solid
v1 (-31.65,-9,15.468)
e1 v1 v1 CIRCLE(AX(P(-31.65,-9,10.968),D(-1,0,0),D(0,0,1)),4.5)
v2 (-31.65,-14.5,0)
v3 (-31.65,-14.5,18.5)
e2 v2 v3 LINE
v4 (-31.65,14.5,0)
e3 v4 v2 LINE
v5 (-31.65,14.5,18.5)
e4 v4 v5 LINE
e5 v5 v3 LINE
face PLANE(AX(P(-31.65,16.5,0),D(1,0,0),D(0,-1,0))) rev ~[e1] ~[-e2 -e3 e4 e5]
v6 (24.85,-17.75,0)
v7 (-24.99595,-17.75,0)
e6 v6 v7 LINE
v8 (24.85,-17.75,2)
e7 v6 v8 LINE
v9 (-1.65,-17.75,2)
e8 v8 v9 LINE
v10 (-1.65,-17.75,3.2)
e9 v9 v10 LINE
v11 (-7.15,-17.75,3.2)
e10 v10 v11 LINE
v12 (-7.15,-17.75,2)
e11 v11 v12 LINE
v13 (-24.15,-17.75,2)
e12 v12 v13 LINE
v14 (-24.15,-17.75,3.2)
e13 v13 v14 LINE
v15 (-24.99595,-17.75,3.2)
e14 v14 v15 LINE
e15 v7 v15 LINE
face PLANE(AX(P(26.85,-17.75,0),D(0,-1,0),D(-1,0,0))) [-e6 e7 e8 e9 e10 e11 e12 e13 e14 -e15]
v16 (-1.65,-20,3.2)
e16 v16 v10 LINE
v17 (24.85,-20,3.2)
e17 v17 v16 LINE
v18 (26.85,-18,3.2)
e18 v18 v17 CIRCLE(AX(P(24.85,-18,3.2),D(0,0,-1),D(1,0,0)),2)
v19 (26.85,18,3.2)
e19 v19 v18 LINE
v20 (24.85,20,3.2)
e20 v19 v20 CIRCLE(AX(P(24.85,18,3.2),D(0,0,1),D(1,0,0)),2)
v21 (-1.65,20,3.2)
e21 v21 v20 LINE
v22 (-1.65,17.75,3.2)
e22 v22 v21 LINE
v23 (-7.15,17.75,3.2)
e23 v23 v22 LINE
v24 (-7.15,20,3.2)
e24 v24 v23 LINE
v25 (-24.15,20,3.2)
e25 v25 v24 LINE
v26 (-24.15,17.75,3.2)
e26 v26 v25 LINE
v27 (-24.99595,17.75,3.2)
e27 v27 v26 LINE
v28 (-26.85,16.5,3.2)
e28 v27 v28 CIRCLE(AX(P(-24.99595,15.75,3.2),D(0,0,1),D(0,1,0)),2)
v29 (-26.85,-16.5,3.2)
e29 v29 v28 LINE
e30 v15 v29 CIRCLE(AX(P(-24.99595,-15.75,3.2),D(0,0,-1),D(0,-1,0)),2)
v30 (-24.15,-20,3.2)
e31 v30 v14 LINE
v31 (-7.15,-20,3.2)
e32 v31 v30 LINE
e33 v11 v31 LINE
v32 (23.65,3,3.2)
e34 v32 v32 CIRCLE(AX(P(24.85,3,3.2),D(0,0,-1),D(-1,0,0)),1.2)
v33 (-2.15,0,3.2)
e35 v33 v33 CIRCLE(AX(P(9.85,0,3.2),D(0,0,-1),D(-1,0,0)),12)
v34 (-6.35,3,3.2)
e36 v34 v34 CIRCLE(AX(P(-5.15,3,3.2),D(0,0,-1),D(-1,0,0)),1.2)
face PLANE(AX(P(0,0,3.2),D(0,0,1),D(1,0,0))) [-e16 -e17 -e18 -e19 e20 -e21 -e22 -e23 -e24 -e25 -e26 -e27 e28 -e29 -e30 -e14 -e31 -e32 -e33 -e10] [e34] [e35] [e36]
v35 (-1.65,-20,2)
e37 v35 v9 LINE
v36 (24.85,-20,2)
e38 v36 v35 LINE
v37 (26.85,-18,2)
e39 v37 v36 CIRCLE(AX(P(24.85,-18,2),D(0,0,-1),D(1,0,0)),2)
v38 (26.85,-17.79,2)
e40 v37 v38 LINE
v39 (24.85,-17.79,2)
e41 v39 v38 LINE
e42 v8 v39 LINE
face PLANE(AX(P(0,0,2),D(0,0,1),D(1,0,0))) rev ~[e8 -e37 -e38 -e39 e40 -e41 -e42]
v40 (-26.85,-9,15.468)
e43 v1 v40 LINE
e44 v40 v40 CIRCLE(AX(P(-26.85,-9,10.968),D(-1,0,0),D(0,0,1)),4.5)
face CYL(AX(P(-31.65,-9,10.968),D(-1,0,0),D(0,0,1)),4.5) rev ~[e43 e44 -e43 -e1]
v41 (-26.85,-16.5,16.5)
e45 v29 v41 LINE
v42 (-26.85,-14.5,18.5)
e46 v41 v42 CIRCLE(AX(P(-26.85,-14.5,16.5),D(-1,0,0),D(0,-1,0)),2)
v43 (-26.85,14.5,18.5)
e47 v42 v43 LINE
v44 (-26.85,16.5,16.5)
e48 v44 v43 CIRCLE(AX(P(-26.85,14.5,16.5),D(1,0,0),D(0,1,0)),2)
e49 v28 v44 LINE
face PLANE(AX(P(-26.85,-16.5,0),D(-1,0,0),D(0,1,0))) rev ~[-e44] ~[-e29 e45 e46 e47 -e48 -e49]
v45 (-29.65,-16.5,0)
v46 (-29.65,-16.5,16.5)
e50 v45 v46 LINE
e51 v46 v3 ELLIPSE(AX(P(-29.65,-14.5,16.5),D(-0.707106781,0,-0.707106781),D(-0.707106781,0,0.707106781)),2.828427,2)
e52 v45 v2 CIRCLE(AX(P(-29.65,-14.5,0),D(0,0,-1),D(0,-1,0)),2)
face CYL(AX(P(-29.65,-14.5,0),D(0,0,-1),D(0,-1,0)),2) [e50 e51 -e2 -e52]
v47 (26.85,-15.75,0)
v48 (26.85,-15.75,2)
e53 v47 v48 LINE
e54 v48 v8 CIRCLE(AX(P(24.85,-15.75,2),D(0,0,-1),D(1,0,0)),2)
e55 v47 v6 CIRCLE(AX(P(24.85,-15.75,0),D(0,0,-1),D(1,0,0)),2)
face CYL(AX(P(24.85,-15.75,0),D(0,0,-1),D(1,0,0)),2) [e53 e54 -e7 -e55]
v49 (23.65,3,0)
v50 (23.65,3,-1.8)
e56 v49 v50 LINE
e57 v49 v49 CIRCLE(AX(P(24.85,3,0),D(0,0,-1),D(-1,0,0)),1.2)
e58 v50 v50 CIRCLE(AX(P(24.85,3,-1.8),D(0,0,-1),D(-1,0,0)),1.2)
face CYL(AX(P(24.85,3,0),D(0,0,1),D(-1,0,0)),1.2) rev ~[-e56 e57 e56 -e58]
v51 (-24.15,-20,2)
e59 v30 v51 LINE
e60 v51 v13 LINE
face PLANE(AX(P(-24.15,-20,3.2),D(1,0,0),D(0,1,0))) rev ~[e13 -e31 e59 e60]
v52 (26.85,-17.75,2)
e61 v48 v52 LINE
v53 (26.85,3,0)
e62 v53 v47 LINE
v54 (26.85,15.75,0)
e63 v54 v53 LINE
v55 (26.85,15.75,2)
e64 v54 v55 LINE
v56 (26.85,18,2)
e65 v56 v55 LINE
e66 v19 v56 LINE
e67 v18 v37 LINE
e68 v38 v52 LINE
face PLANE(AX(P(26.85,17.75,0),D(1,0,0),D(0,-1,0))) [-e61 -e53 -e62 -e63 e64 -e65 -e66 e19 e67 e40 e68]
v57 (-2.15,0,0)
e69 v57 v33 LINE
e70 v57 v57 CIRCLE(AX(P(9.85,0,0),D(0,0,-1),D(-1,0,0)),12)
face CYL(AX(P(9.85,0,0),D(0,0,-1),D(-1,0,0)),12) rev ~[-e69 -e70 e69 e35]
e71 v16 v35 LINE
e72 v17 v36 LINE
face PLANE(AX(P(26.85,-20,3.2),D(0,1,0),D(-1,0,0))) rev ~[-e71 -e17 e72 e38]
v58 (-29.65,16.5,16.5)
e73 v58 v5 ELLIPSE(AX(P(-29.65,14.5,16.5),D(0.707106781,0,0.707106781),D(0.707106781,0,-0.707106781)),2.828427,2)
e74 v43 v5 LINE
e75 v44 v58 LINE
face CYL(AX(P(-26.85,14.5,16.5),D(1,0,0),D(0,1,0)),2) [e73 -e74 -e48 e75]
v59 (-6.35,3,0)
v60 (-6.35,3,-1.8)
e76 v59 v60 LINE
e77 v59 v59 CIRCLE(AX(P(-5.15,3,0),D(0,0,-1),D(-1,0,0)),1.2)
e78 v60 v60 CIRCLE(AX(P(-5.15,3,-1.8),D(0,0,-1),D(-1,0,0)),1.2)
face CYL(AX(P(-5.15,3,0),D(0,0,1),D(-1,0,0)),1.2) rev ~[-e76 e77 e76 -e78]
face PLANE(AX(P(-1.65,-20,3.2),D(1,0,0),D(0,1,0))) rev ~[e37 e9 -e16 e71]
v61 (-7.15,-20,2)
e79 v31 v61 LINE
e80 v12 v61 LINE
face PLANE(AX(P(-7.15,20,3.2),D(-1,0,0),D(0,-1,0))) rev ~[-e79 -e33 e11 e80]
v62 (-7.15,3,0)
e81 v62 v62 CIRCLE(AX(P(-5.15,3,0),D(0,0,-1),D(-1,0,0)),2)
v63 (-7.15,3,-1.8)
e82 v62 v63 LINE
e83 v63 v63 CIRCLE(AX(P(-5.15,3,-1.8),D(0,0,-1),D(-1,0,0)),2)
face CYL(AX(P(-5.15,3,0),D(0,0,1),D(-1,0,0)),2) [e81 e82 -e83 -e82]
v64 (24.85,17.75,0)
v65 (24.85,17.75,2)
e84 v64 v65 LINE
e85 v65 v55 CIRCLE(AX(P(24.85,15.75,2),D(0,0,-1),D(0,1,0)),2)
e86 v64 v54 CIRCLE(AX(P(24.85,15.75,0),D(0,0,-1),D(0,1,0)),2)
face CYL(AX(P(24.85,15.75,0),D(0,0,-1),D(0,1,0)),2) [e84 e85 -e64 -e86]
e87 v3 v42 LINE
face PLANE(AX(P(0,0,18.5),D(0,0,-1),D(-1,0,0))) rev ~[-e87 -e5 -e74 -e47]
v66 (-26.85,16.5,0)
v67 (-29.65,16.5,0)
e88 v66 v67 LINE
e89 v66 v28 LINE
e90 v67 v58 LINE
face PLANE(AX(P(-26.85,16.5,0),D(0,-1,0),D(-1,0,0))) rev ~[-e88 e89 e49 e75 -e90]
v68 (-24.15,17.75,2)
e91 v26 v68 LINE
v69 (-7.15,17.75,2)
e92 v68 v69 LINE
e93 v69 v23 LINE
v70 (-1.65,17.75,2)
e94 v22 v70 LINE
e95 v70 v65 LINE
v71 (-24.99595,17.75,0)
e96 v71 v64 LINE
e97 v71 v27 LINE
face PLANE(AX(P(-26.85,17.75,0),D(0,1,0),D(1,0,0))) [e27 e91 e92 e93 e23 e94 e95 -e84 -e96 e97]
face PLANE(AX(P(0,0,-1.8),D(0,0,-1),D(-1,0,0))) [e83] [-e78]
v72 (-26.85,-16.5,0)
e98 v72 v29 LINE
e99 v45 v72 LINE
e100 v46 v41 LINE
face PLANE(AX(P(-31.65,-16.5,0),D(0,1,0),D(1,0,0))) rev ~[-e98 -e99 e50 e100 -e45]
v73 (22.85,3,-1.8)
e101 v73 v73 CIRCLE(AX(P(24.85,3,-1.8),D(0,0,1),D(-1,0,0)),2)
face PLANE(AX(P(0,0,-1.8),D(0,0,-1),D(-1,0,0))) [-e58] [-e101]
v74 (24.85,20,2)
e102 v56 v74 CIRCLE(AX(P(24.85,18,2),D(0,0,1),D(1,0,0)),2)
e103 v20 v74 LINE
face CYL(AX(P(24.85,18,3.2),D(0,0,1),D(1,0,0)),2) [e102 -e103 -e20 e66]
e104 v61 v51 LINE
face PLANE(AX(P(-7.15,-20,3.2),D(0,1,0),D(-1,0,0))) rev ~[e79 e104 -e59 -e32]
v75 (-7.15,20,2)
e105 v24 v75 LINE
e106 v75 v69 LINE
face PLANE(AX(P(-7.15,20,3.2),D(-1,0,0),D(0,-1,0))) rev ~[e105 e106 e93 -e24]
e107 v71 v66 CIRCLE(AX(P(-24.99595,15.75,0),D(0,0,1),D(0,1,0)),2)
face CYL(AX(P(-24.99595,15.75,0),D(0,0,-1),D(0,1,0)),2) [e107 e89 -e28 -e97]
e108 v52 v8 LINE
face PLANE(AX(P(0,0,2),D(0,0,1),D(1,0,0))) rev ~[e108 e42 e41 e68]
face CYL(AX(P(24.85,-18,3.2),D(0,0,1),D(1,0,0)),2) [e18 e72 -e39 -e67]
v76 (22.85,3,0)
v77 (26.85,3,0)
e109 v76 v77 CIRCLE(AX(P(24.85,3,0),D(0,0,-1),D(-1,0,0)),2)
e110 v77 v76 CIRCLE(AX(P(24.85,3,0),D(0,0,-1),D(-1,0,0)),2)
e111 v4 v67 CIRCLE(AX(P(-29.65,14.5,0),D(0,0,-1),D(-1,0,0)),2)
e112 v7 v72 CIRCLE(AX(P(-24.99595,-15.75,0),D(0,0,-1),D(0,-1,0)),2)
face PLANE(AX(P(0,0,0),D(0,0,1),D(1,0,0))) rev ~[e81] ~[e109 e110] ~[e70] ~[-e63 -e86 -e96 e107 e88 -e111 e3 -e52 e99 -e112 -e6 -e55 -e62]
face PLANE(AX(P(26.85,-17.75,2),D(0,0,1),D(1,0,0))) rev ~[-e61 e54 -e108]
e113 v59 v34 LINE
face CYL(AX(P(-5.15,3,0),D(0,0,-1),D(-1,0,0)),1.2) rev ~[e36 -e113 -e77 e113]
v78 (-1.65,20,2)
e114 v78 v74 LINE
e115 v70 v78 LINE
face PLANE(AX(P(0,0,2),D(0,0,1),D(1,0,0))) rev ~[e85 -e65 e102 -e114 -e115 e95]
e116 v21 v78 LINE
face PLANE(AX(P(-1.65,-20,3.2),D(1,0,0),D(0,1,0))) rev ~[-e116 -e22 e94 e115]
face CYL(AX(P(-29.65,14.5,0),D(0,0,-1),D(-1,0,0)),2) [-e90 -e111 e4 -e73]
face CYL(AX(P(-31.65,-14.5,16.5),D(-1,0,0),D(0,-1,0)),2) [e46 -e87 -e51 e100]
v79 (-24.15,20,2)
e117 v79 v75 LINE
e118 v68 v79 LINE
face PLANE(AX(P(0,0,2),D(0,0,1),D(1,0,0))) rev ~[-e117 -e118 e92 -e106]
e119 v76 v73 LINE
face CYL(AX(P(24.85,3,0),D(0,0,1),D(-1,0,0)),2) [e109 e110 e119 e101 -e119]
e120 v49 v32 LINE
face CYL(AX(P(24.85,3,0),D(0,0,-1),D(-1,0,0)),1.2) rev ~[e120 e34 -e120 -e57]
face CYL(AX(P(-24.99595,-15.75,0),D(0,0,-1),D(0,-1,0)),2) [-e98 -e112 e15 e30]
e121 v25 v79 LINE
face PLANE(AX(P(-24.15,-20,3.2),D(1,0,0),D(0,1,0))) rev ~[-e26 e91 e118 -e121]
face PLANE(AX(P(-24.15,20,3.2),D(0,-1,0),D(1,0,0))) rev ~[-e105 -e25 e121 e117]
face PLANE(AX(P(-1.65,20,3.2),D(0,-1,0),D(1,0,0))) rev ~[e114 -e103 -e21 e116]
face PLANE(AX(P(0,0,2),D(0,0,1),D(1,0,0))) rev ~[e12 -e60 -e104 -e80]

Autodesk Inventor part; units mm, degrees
ref_plane "YZ Plane" through (0, 0, 0) normal (1, 0, 0) x (0, 1, 0)
ref_plane "XZ Plane" through (0, 0, 0) normal (0, 1, 0) x (-1, 0, 0)
ref_plane "XY Plane" through (0, 0, 0) normal (0, 0, 1) x (1, 0, 0)
sketch "Эскиз1" plane through (0, 0, 0) normal (0, 0, 1) x (1, 0, 0)
  line L0 (-26.85, 17.75) -> (26.85, 17.75)
  line L1 (26.85, 17.75) -> (26.85, -17.75)
  line L2 (26.85, -17.75) -> (-26.85, -17.75)
  line L3 (-26.85, -17.75) -> (-26.85, 17.75)
  line L4 (-26.85, 17.75) -> (26.85, -17.75) construction
  line L5 (26.85, 17.75) -> (-26.85, -17.75) construction
  point P0 (0, 0)
  dimension "d0" = 53.7
  dimension "d1" = 35.5
extrude "Выдавливание1" add sketch "Эскиз1" along normal blind 3.2
sketch "Эскиз2" plane through (0, 0, 0) normal (0, 0, -1) x (-1, 0, 0)
  line L0 (31.65, -16.5) -> (26.85, -16.5)
  line L1 (26.85, -16.5) -> (26.85, 16.5)
  line L2 (26.85, 16.5) -> (31.65, 16.5)
  line L3 (31.65, 16.5) -> (31.65, -16.5)
  line L4 (31.65, -16.5) -> (26.85, 16.5) construction
  line L5 (26.85, -16.5) -> (31.65, 16.5) construction
  line L6 (26.85, 17.75) -> (26.85, -17.75) projected
  point P0 (0, 0)
  point P1 (29.25, 0)
  point P2 (26.85, 0)
  dimension "d4" = 4.8
  dimension "d5" = 33
extrude "Выдавливание2" add sketch "Эскиз2" against normal blind 18.5
sketch "Эскиз3" plane through (0, 0, 3.2) normal (0, 0, 1) x (1, 0, 0)
  line L0 (-1.65, 20) -> (26.85, 20)
  line L1 (26.85, 20) -> (26.85, -20)
  line L2 (26.85, -20) -> (-1.65, -20)
  line L3 (-1.65, -20) -> (-1.65, 20)
  line L4 (-1.65, 20) -> (26.85, -20) construction
  line L5 (26.85, 20) -> (-1.65, -20) construction
  line L6 (26.85, -17.75) -> (26.85, 17.75) projected
  line L7 (-24.15, 20) -> (-7.15, 20)
  line L8 (-7.15, 20) -> (-7.15, -20)
  line L9 (-7.15, -20) -> (-24.15, -20)
  line L10 (-24.15, -20) -> (-24.15, 20)
  line L11 (-24.15, 20) -> (-7.15, -20) construction
  line L12 (-7.15, 20) -> (-24.15, -20) construction
  point P0 (0, 0)
  point P1 (12.6, 0)
  point P2 (26.85, 0)
  point P3 (-15.65, 0)
  dimension "d8" = 28.5
  dimension "d9" = 40
  dimension "d10" = 17
  dimension "d11" = 40
  dimension "d12" = 5.5
extrude "Выдавливание3" add sketch "Эскиз3" against normal blind 1.2
sketch "Эскиз4" plane through (0, 0, 0) normal (0, 0, -1) x (-1, 0, 0)
  circle A0 centre (-9.85, 0) radius 12
  line L0 (-26.85, -17.75) -> (-26.85, 17.75) projected
  circle A1 centre (-24.85, 3) radius 2
  circle A2 centre (-24.85, 3) radius 1.2
  line L1 (-9.85, 0) -> (-9.85, 16.0932) construction
  circle A3 centre (5.15, 3) radius 2
  circle A4 centre (5.15, 3) radius 1.2
  line L2 (1.65, 20) -> (-26.85, 20) projected
  point P0 (0, 0)
  dimension "d15" = 24
  dimension "d16" = 17
  dimension "d17" = 4
  dimension "d18" = 2.4
  dimension "d19" = 30
  dimension "d20" = 17
extrude "Выдавливание4" cut sketch "Эскиз4" against normal up to next contours A0
extrude "Выдавливание5" add sketch "Эскиз4" along normal blind 1.8 contours A1 | A3
extrude "Выдавливание6" cut sketch "Эскиз4" against normal up to next contours A2 | A4
sketch "Эскиз5" plane through (-31.65, -16.5, 0) normal (-1, 0, 0) x (0, 0, 1)
  circle A0 centre (10.968, 7.5) radius 4.5
  line L0 (0, 0) -> (18.5, 0) projected
  point P0 (0, 16.5)
  dimension "d27" = 9
  dimension "d28" = 7.5
extrude "Выдавливание7" cut sketch "Эскиз5" against normal up to next
fillet "Сопряжение1" radius 2 10 edges at (-29.25, -16.5, 18.5) (-29.25, 16.5, 18.5) (-31.65, -16.5, 9.25) (-31.65, 16.5, 9.25) (26.85, 20, 2.6) (26.85, 17.75, 1) (26.85, -17.75, 1) (26.85, -20, 2.6) (-26.85, 17.75, 1.6) (-26.85, -17.75, 1.6)
properties part number "ЛЦМК000002.00.00.00.00.15"
